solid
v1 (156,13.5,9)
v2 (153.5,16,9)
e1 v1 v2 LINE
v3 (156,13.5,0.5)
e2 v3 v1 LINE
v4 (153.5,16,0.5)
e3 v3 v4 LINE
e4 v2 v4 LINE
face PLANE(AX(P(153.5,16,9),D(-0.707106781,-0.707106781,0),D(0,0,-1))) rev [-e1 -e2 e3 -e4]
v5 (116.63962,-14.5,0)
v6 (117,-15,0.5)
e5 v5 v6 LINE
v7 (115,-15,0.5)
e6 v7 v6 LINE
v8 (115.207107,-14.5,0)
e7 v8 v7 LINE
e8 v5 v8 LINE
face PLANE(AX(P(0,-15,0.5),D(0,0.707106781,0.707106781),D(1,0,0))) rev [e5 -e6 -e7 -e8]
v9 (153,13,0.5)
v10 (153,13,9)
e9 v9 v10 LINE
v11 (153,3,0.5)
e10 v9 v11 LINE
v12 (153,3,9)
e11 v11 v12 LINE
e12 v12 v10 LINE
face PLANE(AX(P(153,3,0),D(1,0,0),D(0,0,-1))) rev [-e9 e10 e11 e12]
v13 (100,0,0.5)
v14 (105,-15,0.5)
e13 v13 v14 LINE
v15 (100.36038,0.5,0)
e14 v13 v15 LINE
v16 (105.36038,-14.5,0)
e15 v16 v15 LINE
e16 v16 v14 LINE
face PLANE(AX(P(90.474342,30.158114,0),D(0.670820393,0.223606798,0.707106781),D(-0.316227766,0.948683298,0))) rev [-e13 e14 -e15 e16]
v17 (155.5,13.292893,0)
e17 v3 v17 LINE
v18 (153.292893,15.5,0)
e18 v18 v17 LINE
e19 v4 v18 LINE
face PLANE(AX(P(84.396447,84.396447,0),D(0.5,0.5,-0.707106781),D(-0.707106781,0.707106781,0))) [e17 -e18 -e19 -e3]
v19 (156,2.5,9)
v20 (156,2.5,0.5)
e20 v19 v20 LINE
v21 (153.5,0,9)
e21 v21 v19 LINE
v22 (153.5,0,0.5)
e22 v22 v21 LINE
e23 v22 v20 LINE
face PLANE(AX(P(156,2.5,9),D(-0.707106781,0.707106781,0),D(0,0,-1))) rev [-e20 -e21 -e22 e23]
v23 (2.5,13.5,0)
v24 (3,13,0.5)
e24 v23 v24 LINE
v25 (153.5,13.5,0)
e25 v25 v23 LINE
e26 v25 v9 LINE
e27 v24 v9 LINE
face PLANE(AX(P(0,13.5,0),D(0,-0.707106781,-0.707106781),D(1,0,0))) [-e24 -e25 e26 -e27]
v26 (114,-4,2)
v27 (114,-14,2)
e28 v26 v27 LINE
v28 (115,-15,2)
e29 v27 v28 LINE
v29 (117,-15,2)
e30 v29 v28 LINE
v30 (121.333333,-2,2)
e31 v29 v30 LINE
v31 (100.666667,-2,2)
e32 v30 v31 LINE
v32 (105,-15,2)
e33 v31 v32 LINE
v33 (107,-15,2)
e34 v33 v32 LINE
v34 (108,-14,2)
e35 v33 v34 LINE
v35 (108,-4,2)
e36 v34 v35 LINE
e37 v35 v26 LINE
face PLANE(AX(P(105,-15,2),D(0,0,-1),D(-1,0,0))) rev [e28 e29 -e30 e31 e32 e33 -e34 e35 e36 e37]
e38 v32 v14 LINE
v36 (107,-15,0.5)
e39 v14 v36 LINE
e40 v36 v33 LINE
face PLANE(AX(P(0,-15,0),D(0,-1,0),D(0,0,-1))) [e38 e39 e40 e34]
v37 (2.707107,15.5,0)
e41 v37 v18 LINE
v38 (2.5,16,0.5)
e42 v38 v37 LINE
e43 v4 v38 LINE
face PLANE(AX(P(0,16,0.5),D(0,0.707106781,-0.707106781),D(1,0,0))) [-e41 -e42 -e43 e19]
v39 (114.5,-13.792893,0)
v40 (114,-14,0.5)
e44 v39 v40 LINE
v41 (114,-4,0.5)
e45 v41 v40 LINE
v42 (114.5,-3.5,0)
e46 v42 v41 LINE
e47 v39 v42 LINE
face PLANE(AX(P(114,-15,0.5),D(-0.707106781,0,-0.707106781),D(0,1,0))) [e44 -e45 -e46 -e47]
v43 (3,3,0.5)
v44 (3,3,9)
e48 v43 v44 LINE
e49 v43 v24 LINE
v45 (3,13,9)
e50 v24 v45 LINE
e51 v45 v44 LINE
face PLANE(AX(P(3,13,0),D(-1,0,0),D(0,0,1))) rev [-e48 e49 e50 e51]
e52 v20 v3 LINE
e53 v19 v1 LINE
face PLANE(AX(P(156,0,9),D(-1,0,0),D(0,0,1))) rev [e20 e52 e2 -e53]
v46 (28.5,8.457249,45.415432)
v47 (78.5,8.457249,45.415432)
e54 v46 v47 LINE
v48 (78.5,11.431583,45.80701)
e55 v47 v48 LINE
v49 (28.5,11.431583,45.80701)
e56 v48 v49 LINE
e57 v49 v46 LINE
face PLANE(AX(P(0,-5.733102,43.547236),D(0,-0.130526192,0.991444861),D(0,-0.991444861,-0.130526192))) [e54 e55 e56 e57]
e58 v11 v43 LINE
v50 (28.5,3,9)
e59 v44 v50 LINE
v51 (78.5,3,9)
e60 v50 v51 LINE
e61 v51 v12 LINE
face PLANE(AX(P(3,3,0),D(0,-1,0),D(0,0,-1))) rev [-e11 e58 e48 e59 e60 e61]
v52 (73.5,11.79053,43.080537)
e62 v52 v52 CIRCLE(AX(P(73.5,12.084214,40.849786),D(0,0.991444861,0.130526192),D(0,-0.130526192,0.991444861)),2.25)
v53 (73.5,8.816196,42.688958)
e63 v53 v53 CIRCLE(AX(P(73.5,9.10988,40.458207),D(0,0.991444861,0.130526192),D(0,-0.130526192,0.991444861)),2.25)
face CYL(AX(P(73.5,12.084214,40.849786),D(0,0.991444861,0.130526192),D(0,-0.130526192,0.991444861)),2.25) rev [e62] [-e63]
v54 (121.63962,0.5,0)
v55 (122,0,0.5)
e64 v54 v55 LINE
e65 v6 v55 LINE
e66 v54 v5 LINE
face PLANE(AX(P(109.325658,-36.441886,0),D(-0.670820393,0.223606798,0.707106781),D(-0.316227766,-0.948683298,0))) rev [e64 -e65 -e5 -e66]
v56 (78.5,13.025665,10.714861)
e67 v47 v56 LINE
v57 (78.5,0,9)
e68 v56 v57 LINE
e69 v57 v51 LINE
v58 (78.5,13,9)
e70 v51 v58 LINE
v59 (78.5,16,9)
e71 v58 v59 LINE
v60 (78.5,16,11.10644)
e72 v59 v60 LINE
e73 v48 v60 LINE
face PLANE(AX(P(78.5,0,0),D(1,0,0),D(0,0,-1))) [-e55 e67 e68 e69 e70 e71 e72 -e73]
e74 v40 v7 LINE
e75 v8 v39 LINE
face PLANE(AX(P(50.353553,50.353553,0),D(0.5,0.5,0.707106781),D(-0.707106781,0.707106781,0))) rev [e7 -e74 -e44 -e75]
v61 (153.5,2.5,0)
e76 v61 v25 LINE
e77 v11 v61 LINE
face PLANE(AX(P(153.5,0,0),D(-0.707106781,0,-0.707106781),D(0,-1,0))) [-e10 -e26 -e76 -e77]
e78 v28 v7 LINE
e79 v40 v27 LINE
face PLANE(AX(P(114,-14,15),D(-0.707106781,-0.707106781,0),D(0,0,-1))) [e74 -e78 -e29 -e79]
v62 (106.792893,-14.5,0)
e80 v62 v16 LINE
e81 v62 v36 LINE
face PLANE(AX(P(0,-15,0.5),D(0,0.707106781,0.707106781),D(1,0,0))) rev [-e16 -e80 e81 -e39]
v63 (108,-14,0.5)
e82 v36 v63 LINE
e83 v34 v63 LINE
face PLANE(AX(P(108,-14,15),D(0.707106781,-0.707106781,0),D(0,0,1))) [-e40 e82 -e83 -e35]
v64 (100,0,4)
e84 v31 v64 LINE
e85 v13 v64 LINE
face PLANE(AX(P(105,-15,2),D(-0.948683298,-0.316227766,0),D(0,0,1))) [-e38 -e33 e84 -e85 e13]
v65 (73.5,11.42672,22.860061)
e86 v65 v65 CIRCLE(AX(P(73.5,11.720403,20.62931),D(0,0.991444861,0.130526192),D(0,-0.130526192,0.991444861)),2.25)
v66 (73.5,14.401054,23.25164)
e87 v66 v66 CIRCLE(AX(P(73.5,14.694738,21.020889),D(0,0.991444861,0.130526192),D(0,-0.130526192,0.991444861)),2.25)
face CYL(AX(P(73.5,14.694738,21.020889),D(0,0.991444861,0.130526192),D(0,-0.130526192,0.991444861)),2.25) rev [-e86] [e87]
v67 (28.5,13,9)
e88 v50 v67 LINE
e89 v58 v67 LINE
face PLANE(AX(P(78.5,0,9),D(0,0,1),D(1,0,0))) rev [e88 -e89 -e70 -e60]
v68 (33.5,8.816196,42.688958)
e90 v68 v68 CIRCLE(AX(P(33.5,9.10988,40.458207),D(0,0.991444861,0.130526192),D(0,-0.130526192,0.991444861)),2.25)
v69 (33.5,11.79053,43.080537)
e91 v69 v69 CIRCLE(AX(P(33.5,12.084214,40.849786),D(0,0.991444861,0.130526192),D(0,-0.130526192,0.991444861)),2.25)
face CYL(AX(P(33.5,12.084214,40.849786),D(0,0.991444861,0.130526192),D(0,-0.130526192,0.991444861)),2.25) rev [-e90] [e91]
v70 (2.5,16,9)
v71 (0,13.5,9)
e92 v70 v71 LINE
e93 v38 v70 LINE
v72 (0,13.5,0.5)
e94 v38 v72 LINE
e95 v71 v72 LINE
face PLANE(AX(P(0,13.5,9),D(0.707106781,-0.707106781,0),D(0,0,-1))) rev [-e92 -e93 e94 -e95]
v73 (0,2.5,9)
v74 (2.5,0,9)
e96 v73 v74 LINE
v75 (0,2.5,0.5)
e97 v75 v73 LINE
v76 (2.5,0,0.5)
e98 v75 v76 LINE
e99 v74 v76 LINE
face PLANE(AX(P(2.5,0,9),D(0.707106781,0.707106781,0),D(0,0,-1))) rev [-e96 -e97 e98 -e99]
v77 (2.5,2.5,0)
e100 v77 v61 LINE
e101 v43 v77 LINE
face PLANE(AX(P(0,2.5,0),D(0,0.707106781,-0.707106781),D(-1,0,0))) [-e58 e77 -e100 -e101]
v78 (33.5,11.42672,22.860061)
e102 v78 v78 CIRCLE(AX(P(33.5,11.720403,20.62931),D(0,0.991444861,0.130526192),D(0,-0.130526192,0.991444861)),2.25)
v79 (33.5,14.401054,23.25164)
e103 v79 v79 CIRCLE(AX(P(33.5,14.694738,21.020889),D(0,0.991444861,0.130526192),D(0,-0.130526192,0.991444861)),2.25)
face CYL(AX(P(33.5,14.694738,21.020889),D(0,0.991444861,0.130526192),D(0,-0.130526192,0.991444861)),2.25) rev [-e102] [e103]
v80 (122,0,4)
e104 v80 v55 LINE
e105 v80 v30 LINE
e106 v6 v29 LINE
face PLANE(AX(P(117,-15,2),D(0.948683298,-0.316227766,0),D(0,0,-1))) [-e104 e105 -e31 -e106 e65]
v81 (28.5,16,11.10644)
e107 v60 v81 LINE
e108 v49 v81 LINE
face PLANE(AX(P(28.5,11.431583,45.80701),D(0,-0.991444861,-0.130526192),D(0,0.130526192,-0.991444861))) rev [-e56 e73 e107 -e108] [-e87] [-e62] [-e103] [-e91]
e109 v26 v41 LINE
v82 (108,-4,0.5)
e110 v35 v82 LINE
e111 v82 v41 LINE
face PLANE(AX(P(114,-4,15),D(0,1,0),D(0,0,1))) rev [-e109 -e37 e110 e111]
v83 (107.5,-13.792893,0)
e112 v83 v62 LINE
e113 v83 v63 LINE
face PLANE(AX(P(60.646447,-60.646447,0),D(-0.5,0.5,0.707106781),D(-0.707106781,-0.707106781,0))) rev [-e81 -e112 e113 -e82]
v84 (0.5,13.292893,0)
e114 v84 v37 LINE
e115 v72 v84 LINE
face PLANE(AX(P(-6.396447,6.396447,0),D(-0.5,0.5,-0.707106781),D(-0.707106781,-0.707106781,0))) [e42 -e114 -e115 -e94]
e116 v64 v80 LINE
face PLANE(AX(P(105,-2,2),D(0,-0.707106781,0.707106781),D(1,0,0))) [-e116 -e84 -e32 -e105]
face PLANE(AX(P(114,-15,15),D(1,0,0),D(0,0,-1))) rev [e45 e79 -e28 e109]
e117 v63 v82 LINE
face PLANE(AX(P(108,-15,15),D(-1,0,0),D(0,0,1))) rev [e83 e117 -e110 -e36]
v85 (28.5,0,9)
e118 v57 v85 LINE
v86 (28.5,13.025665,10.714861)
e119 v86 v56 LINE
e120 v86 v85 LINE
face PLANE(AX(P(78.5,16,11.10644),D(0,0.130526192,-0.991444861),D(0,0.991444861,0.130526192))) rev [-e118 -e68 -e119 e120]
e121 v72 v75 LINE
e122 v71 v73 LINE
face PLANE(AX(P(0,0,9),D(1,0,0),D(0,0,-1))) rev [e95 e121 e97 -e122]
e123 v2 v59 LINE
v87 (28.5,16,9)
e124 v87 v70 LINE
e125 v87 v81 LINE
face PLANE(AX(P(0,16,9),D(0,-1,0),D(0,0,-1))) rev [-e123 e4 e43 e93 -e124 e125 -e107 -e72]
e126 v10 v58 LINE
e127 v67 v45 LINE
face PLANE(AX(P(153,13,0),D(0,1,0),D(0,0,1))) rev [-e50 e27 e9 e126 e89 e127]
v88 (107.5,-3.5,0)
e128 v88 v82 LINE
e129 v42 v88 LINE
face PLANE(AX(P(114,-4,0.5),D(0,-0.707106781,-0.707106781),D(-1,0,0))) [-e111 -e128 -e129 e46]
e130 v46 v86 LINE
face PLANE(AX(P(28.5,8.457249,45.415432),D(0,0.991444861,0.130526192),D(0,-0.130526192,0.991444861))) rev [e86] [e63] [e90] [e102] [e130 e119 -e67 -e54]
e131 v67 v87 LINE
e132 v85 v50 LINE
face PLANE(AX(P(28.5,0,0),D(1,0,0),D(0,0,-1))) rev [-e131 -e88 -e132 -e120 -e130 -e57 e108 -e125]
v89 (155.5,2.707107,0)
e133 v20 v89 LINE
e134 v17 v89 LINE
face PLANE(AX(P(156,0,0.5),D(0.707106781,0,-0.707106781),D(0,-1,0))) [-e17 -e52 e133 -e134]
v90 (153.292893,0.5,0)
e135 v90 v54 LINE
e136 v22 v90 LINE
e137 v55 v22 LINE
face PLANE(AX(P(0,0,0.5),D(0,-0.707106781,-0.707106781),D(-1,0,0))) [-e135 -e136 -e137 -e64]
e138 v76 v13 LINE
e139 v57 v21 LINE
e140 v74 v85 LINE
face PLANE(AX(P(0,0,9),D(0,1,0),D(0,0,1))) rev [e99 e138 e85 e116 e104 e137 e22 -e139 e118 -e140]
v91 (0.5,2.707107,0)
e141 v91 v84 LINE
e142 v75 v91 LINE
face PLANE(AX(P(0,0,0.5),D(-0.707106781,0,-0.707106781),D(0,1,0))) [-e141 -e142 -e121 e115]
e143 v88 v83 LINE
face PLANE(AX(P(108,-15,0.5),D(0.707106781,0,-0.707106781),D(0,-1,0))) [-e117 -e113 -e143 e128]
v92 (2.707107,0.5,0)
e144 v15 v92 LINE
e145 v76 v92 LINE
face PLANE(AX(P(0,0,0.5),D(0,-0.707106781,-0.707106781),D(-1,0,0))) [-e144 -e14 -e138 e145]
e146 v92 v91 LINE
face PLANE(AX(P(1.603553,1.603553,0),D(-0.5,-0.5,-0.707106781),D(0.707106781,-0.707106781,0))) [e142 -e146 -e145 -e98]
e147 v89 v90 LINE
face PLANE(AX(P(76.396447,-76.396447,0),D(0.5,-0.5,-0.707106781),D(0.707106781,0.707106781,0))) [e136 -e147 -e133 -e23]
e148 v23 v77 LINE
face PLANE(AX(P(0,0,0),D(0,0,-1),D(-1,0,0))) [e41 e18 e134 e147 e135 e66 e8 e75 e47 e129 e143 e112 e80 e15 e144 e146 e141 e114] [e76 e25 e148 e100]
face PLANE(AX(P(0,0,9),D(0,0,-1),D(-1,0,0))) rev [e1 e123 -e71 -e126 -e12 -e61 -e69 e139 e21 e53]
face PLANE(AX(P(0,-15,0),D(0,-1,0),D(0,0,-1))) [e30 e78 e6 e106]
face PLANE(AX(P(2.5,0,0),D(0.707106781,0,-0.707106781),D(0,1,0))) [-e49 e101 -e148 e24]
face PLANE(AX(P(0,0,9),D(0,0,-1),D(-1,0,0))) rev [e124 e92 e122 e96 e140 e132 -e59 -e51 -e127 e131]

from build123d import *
from OCP.BRepFilletAPI import BRepFilletAPI_MakeChamfer

# Parameters (mm, degrees)
SKETCH1_W            = 156
SKETCH1_H            = 16
BOSS_EXTRUDE1_DEPTH  = 9
SKETCH2_W            = 150
SKETCH2_H            = 10
CUT_EXTRUDE1_DEPTH   = 9
BOSS_EXTRUDE2_START  = -127.5
BOSS_EXTRUDE2_DEPTH  = 50
SKETCH5_W            = 50
SKETCH5_H            = 3
BOSS_EXTRUDE3_DEPTH  = 35
M4_CLEARANCE_HOLE1_D = 4.5
SKETCH10_W           = 12
SKETCH10_H           = 2
BOSS_EXTRUDE4_DEPTH  = 15
SKETCH11_W           = 6
SKETCH11_H           = 11
CUT_EXTRUDE2_DEPTH   = 15
CHAMFER1_SIZE        = 5
CHAMFER1_SIZE_2      = 15
CHAMFER2_SIZE        = 1
CHAMFER3_SIZE        = 2.5
CHAMFER4_SIZE        = 2
CHAMFER5_SIZE        = 0.5


# Some blends are built 0.0001 mm under size
with BuildPart() as part:
    # Sketch1 → Boss-Extrude1 (new body)
    with BuildSketch(Plane.XY):
        with Locations((78, 8)):
            Rectangle(SKETCH1_W, SKETCH1_H)
    extrude(amount=BOSS_EXTRUDE1_DEPTH)

    # Sketch2 → Cut-Extrude1 (cut)
    with BuildSketch(Plane.XY.offset(9)):
        with Locations((78, 8)):
            Rectangle(SKETCH2_W, SKETCH2_H)
    extrude(amount=-CUT_EXTRUDE1_DEPTH, mode=Mode.SUBTRACT)

    # Sketch4 → Boss-Extrude2 (add)
    with BuildSketch(Plane(origin=(156, 0, 0), x_dir=(0, 0, -1), z_dir=(1, 0, 0)).offset(BOSS_EXTRUDE2_START)):
        Polygon((-9, 16), (-11.106439961, 16), (-9, 0), align=None)
    extrude(amount=BOSS_EXTRUDE2_DEPTH)

    # Sketch5 → Boss-Extrude3 (add)
    with BuildSketch(Plane(origin=(0, -1.164685703, 8.846666218), x_dir=(1, 0, 0), z_dir=(0, -0.13052619222004497, 0.9914448613738114))):
        with Locations((53.5, 15.812799099)):
            Rectangle(SKETCH5_W, SKETCH5_H)
    extrude(amount=BOSS_EXTRUDE3_DEPTH)

    # M4 Clearance Hole1 (through all)
    with Locations(Plane(origin=(0, 17.164685703, 2.259773743), x_dir=(1, 0, 0), z_dir=(0, 0.9914448613738114, 0.130526192220045))):
        with Locations((33.5, -18.923003752), (73.5, -18.923003752), (73.5, -38.923003752), (33.5, -38.923003752)):
            Hole(M4_CLEARANCE_HOLE1_D / 2)

    # Sketch10 → Boss-Extrude4 (add)
    with BuildSketch(Plane.XZ):
        with Locations((111, 1)):
            Rectangle(SKETCH10_W, SKETCH10_H)
    extrude(amount=BOSS_EXTRUDE4_DEPTH)

    # Sketch11 → Cut-Extrude2 (cut)
    with BuildSketch(Plane(origin=(0, 0, 0), x_dir=(-1, 0, 0), z_dir=(0, 0, -1))):
        with Locations((-111, -9.5)):
            Rectangle(SKETCH11_W, SKETCH11_H)
    extrude(amount=-CUT_EXTRUDE2_DEPTH, mode=Mode.SUBTRACT)

    # Chamfer1
    chamfer1_edges_1 = [part.edges().sort_by_distance(p)[0] for p in [
        (117, 0, 1),
    ]]
    chamfer1_side_1 = [part.faces().sort_by_distance(p)[0] for p in [
        (117.1, 0, 1),
    ]]
    chamfer1_edges_2 = [part.edges().sort_by_distance(p)[0] for p in [
        (105, 0, 1),
    ]]
    chamfer1_side_2 = [part.faces().sort_by_distance(p)[0] for p in [
        (104.9, 0, 1),
    ]]
    chamfer1 = BRepFilletAPI_MakeChamfer(part.part.solid().wrapped)
    for e in chamfer1_edges_1:
        chamfer1.Add(CHAMFER1_SIZE - 0.0001, CHAMFER1_SIZE_2 - 0.0001, e.wrapped, chamfer1_side_1[0].wrapped)
    for e in chamfer1_edges_2:
        chamfer1.Add(CHAMFER1_SIZE - 0.0001, CHAMFER1_SIZE_2 - 0.0001, e.wrapped, chamfer1_side_2[0].wrapped)
    add(Compound.cast(chamfer1.Shape()), mode=Mode.REPLACE)  # a hair under: the kernel refuses the full size

    # Chamfer2
    chamfer2_edges = [part.edges().sort_by_distance(p)[0] for p in [
        (108, -15, 1),
        (114, -15, 1),
    ]]
    chamfer(chamfer2_edges, length=CHAMFER2_SIZE)

    # Chamfer3
    chamfer3_edges = [part.edges().sort_by_distance(p)[0] for p in [
        (0, 16, 4.5),
        (156, 16, 4.5),
        (156, 0, 4.5),
        (0, 0, 4.5),
    ]]
    chamfer(chamfer3_edges, length=CHAMFER3_SIZE)

    # Chamfer4
    chamfer4_edges = [part.edges().sort_by_distance(p)[0] for p in [
        (111, 0, 2),
    ]]
    chamfer(chamfer4_edges, length=CHAMFER4_SIZE)

    # Chamfer5
    # the kernel refuses this chamfer: 0.5 mm, written as the material it takes off along each edge
    with BuildSketch(Plane(origin=(114, -4, 0), x_dir=(-0.027495876610582174, 0, 0.9996219169112968), z_dir=(0, -1, 0)), Plane(origin=(108, -15.285841494, 0), x_dir=(0.027495876610582174, 0, 0.9996219169112968), z_dir=(0, 1, 0))) as chamfer5_piece_1:
        Polygon((CHAMFER5_SIZE * 0.999621916911, -CHAMFER5_SIZE * 0.0274958766106), (-CHAMFER5_SIZE * 0.0274958766106, -CHAMFER5_SIZE * 0.999621916911), (0, 0), align=None)
    extrude(amount=11.285841494, mode=Mode.SUBTRACT)
    with BuildSketch(Plane(origin=(108, -4, 0), x_dir=(0, -0.02749587661058563, 0.9996219169112968), z_dir=(1, 0, 0))) as chamfer5_piece_2:
        Polygon((CHAMFER5_SIZE * 0.999621916911, -CHAMFER5_SIZE * 0.0274958766106), (-CHAMFER5_SIZE * 0.0274958766106, -CHAMFER5_SIZE * 0.999621916911), (0, 0), align=None)
    extrude(amount=6, mode=Mode.SUBTRACT)
    with BuildSketch(Plane(origin=(120.714058506, 0, 0), x_dir=(0, -0.027495876610586372, 0.9996219169112968), z_dir=(1, 0, 0))) as chamfer5_piece_3_section:
        Polygon((CHAMFER5_SIZE * 0.999621916911, -CHAMFER5_SIZE * 0.0274958766106), (-CHAMFER5_SIZE * 0.0274958766106, -CHAMFER5_SIZE * 0.999621916911), (0, 0), align=None)
    chamfer5_piece_3 = extrude(amount=34.071782988, mode=Mode.PRIVATE)
    chamfer5_piece_3 = split(chamfer5_piece_3, bisect_by=Plane(origin=(123.691323229, 5.074337344, 0.164983246), z_dir=(0.9486845629641077, -0.31622397125075763, 0)), keep=Keep.TOP, mode=Mode.PRIVATE)
    add(chamfer5_piece_3, mode=Mode.SUBTRACT)
    with BuildSketch(Plane(origin=(122.406513904, 1.219857976, 0), x_dir=(0.026084913685623757, -0.008694855294818641, 0.999621916911297), z_dir=(-0.31622397125075763, -0.9486845629641077, 0))) as chamfer5_piece_4_section:
        Polygon((CHAMFER5_SIZE * 0.999621916911, CHAMFER5_SIZE * 0.0274958766106), (-CHAMFER5_SIZE * 0.0274958766106, CHAMFER5_SIZE * 0.999621916911), (0, 0), align=None)
    chamfer5_piece_4 = extrude(amount=18.382944798, mode=Mode.PRIVATE)
    chamfer5_piece_4 = split(chamfer5_piece_4, bisect_by=Plane(origin=(119.414869386, 0, 0.166750545), z_dir=(0, -1, 0)), keep=Keep.TOP, mode=Mode.PRIVATE)
    add(chamfer5_piece_4, mode=Mode.SUBTRACT)
    with BuildSketch(Plane(origin=(99.593486096, 1.219857976, 0), x_dir=(0.948325881374337, 0.31610441231498504, -0.027495876610587087), z_dir=(0.31622397125075763, -0.9486845629641077, 0))) as chamfer5_piece_5_section:
        Polygon((CHAMFER5_SIZE * 0.999621916911, CHAMFER5_SIZE * 0.0274958766106), (-CHAMFER5_SIZE * 0.0274958766106, CHAMFER5_SIZE * 0.999621916911), (0, 0), align=None)
    chamfer5_piece_5 = extrude(amount=18.382944798, mode=Mode.PRIVATE)
    chamfer5_piece_5 = split(chamfer5_piece_5, bisect_by=Plane(origin=(102.585130614, 0, 0.166750545), z_dir=(0, -1, 0)), keep=Keep.TOP, mode=Mode.PRIVATE)
    add(chamfer5_piece_5, mode=Mode.SUBTRACT)
    with BuildSketch(Plane(origin=(118.285841494, -15, 0), x_dir=(0, -0.02749587661058563, 0.9996219169112968), z_dir=(-1, 0, 0)), Plane(origin=(108.285841494, -15, 0), x_dir=(0, -0.02749587661058563, 0.9996219169112968), z_dir=(-1, 0, 0))) as chamfer5_piece_6:
        Polygon((CHAMFER5_SIZE * 0.999621916911, CHAMFER5_SIZE * 0.0274958766106), (-CHAMFER5_SIZE * 0.0274958766106, CHAMFER5_SIZE * 0.999621916911), (0, 0), align=None)
    extrude(amount=4.571682988, mode=Mode.SUBTRACT)
    with BuildSketch(Plane(origin=(113.09077276, -13.09077276, 0), x_dir=(-0.01944252080601897, -0.01944252080601897, 0.9996219169112965), z_dir=(0.7071067811865476, -0.7071067811865476, 0)), Plane(origin=(106.09077276, -15.90922724, 0), x_dir=(0.019442520806029328, -0.019442520806029328, 0.9996219169112961), z_dir=(0.7071067811865476, 0.7071067811865476, 0))) as chamfer5_piece_7:
        Polygon((CHAMFER5_SIZE * 0.999621916911, -CHAMFER5_SIZE * 0.0274958766106), (-CHAMFER5_SIZE * 0.0274958766106, -CHAMFER5_SIZE * 0.999621916911), (0, 0), align=None)
    extrude(amount=3.98589655, mode=Mode.SUBTRACT)
    with BuildSketch(Plane(origin=(1.214158506, 0, 0), x_dir=(0, -0.027495876610586372, 0.9996219169112968), z_dir=(1, 0, 0))) as chamfer5_piece_8_section:
        Polygon((CHAMFER5_SIZE * 0.999621916911, -CHAMFER5_SIZE * 0.0274958766106), (-CHAMFER5_SIZE * 0.0274958766106, -CHAMFER5_SIZE * 0.999621916911), (0, 0), align=None)
    chamfer5_piece_8 = extrude(amount=100.071782988, mode=Mode.PRIVATE)
    chamfer5_piece_8 = split(chamfer5_piece_8, bisect_by=Plane(origin=(95.008721747, 14.974334417, 0.164925467), z_dir=(-0.9486845629641077, -0.31622397125075763, 0)), keep=Keep.TOP, mode=Mode.PRIVATE)
    add(chamfer5_piece_8, mode=Mode.SUBTRACT)
    with BuildSketch(Plane(origin=(0, 14.785841494, 0), x_dir=(-0.027495876610586372, 0, 0.9996219169112968), z_dir=(0, -1, 0)), Plane(origin=(156, 1.214158506, 0), x_dir=(0.027495876610582174, 0, 0.9996219169112968), z_dir=(0, 1, 0))) as chamfer5_piece_9:
        Polygon((CHAMFER5_SIZE * 0.999621916911, -CHAMFER5_SIZE * 0.0274958766106), (-CHAMFER5_SIZE * 0.0274958766106, -CHAMFER5_SIZE * 0.999621916911), (0, 0), align=None)
    extrude(amount=13.571682988, mode=Mode.SUBTRACT)
    with BuildSketch(Plane(origin=(154.785841494, 16, 0), x_dir=(0, 0.02749587661058908, 0.9996219169112968), z_dir=(-1, 0, 0))) as chamfer5_piece_10:
        Polygon((CHAMFER5_SIZE * 0.999621916911, -CHAMFER5_SIZE * 0.0274958766106), (-CHAMFER5_SIZE * 0.0274958766106, -CHAMFER5_SIZE * 0.999621916911), (0, 0), align=None)
    extrude(amount=153.571682988, mode=Mode.SUBTRACT)
    with BuildSketch(Plane(origin=(152.59077276, -0.90922724, 0), x_dir=(0.01944252080600009, -0.01944252080600009, 0.9996219169112972), z_dir=(0.7071067811865476, 0.7071067811865476, 0)), Plane(origin=(156.90922724, 12.59077276, 0), x_dir=(0.019442520806003442, 0.019442520806003442, 0.9996219169112972), z_dir=(-0.7071067811865476, 0.7071067811865476, 0)), Plane(origin=(3.40922724, 16.90922724, 0), x_dir=(-0.01944252080601509, 0.01944252080601509, 0.9996219169112968), z_dir=(-0.7071067811865476, -0.7071067811865476, 0))) as chamfer5_piece_11:
        Polygon((CHAMFER5_SIZE * 0.999621916911, -CHAMFER5_SIZE * 0.0274958766106), (-CHAMFER5_SIZE * 0.0274958766106, -CHAMFER5_SIZE * 0.999621916911), (0, 0), align=None)
    extrude(amount=6.107216894, mode=Mode.SUBTRACT)
    with BuildSketch(Plane(origin=(3.40922724, -0.90922724, 0), x_dir=(-0.019442520806014007, -0.019442520806014007, 0.9996219169112968), z_dir=(-0.7071067811865476, 0.7071067811865476, 0))) as chamfer5_piece_12:
        Polygon((CHAMFER5_SIZE * 0.999621916911, CHAMFER5_SIZE * 0.0274958766106), (-CHAMFER5_SIZE * 0.0274958766106, CHAMFER5_SIZE * 0.999621916911), (0, 0), align=None)
    extrude(amount=6.107216894, mode=Mode.SUBTRACT)
    with BuildSketch(Plane(origin=(3, 3, 0), x_dir=(0, 0.027495876610586494, 0.9996219169112968), z_dir=(1, 0, 0)), Plane(origin=(153, 13, 0), x_dir=(0, -0.02749587661058563, 0.9996219169112968), z_dir=(-1, 0, 0))) as chamfer5_piece_13:
        Polygon((CHAMFER5_SIZE * 0.999621916911, CHAMFER5_SIZE * 0.0274958766106), (-CHAMFER5_SIZE * 0.0274958766106, CHAMFER5_SIZE * 0.999621916911), (0, 0), align=None)
    extrude(amount=150, mode=Mode.SUBTRACT)
    with BuildSketch(Plane(origin=(3, 13, 0), x_dir=(0.027495876610586494, 0, 0.9996219169112968), z_dir=(0, -1, 0)), Plane(origin=(153, 3, 0), x_dir=(-0.027495876610582174, 0, 0.9996219169112968), z_dir=(0, 1, 0))) as chamfer5_piece_14:
        Polygon((CHAMFER5_SIZE * 0.999621916911, CHAMFER5_SIZE * 0.0274958766106), (-CHAMFER5_SIZE * 0.0274958766106, CHAMFER5_SIZE * 0.999621916911), (0, 0), align=None)
    extrude(amount=10, mode=Mode.SUBTRACT)
    with BuildSketch(Plane(origin=(114, -2.714158506, 0), x_dir=(-0.027495876610582174, 0, 0.9996219169112968), z_dir=(0, -1, 0))) as chamfer5_piece_15a_section:
        Polygon((CHAMFER5_SIZE * 0.999621916911, -CHAMFER5_SIZE * 0.0274958766106), (-CHAMFER5_SIZE * 0.0274958766106, -CHAMFER5_SIZE * 0.999621916911), (0, 0), align=None)
    chamfer5_piece_15a = extrude(amount=12.571682988, mode=Mode.PRIVATE)
    chamfer5_piece_15a = split(chamfer5_piece_15a, bisect_by=Plane(origin=(114.164896813, -4, 0.164896813), z_dir=(0, 1, 0)), keep=Keep.TOP, mode=Mode.PRIVATE)
    with BuildSketch(Plane(origin=(108, -4, 0), x_dir=(0, -0.02749587661058563, 0.9996219169112968), z_dir=(1, 0, 0))) as chamfer5_piece_15b_section:
        Polygon((CHAMFER5_SIZE * 0.999621916911, -CHAMFER5_SIZE * 0.0274958766106), (-CHAMFER5_SIZE * 0.0274958766106, -CHAMFER5_SIZE * 0.999621916911), (0, 0), align=None)
    chamfer5_piece_15b = extrude(amount=7.285841494, mode=Mode.PRIVATE)
    chamfer5_piece_15b = split(chamfer5_piece_15b, bisect_by=Plane(origin=(114, -3.835103187, 0.164896813), z_dir=(1, 0, 0)), keep=Keep.TOP, mode=Mode.PRIVATE)
    chamfer5_piece_15 = chamfer5_piece_15a & chamfer5_piece_15b
    add(chamfer5_piece_15, mode=Mode.SUBTRACT)
    with BuildSketch(Plane(origin=(106.714158506, -4, 0), x_dir=(0, -0.02749587661058563, 0.9996219169112968), z_dir=(1, 0, 0))) as chamfer5_piece_16a_section:
        Polygon((CHAMFER5_SIZE * 0.999621916911, -CHAMFER5_SIZE * 0.0274958766106), (-CHAMFER5_SIZE * 0.0274958766106, -CHAMFER5_SIZE * 0.999621916911), (0, 0), align=None)
    chamfer5_piece_16a = extrude(amount=7.285841494, mode=Mode.PRIVATE)
    chamfer5_piece_16a = split(chamfer5_piece_16a, bisect_by=Plane(origin=(108, -3.835103187, 0.164896813), z_dir=(-1, 0, 0)), keep=Keep.TOP, mode=Mode.PRIVATE)
    with BuildSketch(Plane(origin=(108, -15.285841494, 0), x_dir=(0.027495876610582174, 0, 0.9996219169112968), z_dir=(0, 1, 0))) as chamfer5_piece_16b_section:
        Polygon((CHAMFER5_SIZE * 0.999621916911, -CHAMFER5_SIZE * 0.0274958766106), (-CHAMFER5_SIZE * 0.0274958766106, -CHAMFER5_SIZE * 0.999621916911), (0, 0), align=None)
    chamfer5_piece_16b = extrude(amount=12.571682988, mode=Mode.PRIVATE)
    chamfer5_piece_16b = split(chamfer5_piece_16b, bisect_by=Plane(origin=(107.835103187, -4, 0.164896813), z_dir=(0, 1, 0)), keep=Keep.TOP, mode=Mode.PRIVATE)
    chamfer5_piece_16 = chamfer5_piece_16a & chamfer5_piece_16b
    add(chamfer5_piece_16, mode=Mode.SUBTRACT)
    with BuildSketch(Plane(origin=(120.714058506, 0, 0), x_dir=(0, -0.027495876610586372, 0.9996219169112968), z_dir=(1, 0, 0))) as chamfer5_piece_17a_section:
        Polygon((CHAMFER5_SIZE * 0.999621916911, -CHAMFER5_SIZE * 0.0274958766106), (-CHAMFER5_SIZE * 0.0274958766106, -CHAMFER5_SIZE * 0.999621916911), (0, 0), align=None)
    chamfer5_piece_17a = extrude(amount=34.071782988, mode=Mode.PRIVATE)
    chamfer5_piece_17a = split(chamfer5_piece_17a, bisect_by=Plane(origin=(121.989075947, -0.032472593, 0.162786872), z_dir=(-0.9486845629641077, 0.31622397125075763, 0)), keep=Keep.TOP, mode=Mode.PRIVATE)
    with BuildSketch(Plane(origin=(122.406513904, 1.219857976, 0), x_dir=(0.026084913685623757, -0.008694855294818641, 0.999621916911297), z_dir=(-0.31622397125075763, -0.9486845629641077, 0))) as chamfer5_piece_17b_section:
        Polygon((CHAMFER5_SIZE * 0.999621916911, CHAMFER5_SIZE * 0.0274958766106), (-CHAMFER5_SIZE * 0.0274958766106, CHAMFER5_SIZE * 0.999621916911), (0, 0), align=None)
    chamfer5_piece_17b = extrude(amount=18.382944798, mode=Mode.PRIVATE)
    chamfer5_piece_17b = split(chamfer5_piece_17b, bisect_by=Plane(origin=(122.034129073, 0, 0.162786872), z_dir=(0, 1, 0)), keep=Keep.TOP, mode=Mode.PRIVATE)
    chamfer5_piece_17 = chamfer5_piece_17a & chamfer5_piece_17b
    add(chamfer5_piece_17, mode=Mode.SUBTRACT)
    with BuildSketch(Plane(origin=(1.214158506, 0, 0), x_dir=(0, -0.027495876610586372, 0.9996219169112968), z_dir=(1, 0, 0))) as chamfer5_piece_18a_section:
        Polygon((CHAMFER5_SIZE * 0.999621916911, -CHAMFER5_SIZE * 0.0274958766106), (-CHAMFER5_SIZE * 0.0274958766106, -CHAMFER5_SIZE * 0.999621916911), (0, 0), align=None)
    chamfer5_piece_18a = extrude(amount=100.071782988, mode=Mode.PRIVATE)
    chamfer5_piece_18a = split(chamfer5_piece_18a, bisect_by=Plane(origin=(100.010924053, -0.032472593, 0.162786872), z_dir=(0.9486845629641077, 0.31622397125075763, 0)), keep=Keep.TOP, mode=Mode.PRIVATE)
    with BuildSketch(Plane(origin=(99.593486096, 1.219857976, 0), x_dir=(0.948325881374337, 0.31610441231498504, -0.027495876610587087), z_dir=(0.31622397125075763, -0.9486845629641077, 0))) as chamfer5_piece_18b_section:
        Polygon((CHAMFER5_SIZE * 0.999621916911, CHAMFER5_SIZE * 0.0274958766106), (-CHAMFER5_SIZE * 0.0274958766106, CHAMFER5_SIZE * 0.999621916911), (0, 0), align=None)
    chamfer5_piece_18b = extrude(amount=18.382944798, mode=Mode.PRIVATE)
    chamfer5_piece_18b = split(chamfer5_piece_18b, bisect_by=Plane(origin=(99.965870927, 0, 0.162786872), z_dir=(0, 1, 0)), keep=Keep.TOP, mode=Mode.PRIVATE)
    chamfer5_piece_18 = chamfer5_piece_18a & chamfer5_piece_18b
    add(chamfer5_piece_18, mode=Mode.SUBTRACT)
    with BuildSketch(Plane(origin=(1.714158506, 3, 0), x_dir=(0, 0.027495876610586494, 0.9996219169112968), z_dir=(1, 0, 0))) as chamfer5_piece_19a_section:
        Polygon((CHAMFER5_SIZE * 0.999621916911, CHAMFER5_SIZE * 0.0274958766106), (-CHAMFER5_SIZE * 0.0274958766106, CHAMFER5_SIZE * 0.999621916911), (0, 0), align=None)
    chamfer5_piece_19a = extrude(amount=151.285841494, mode=Mode.PRIVATE)
    chamfer5_piece_19a = split(chamfer5_piece_19a, bisect_by=Plane(origin=(3, 2.835103187, 0.164896813), z_dir=(-1, 0, 0)), keep=Keep.TOP, mode=Mode.PRIVATE)
    with BuildSketch(Plane(origin=(3, 13, 0), x_dir=(0.027495876610586494, 0, 0.9996219169112968), z_dir=(0, -1, 0))) as chamfer5_piece_19b_section:
        Polygon((CHAMFER5_SIZE * 0.999621916911, CHAMFER5_SIZE * 0.0274958766106), (-CHAMFER5_SIZE * 0.0274958766106, CHAMFER5_SIZE * 0.999621916911), (0, 0), align=None)
    chamfer5_piece_19b = extrude(amount=11.285841494, mode=Mode.PRIVATE)
    chamfer5_piece_19b = split(chamfer5_piece_19b, bisect_by=Plane(origin=(2.835103187, 3, 0.164896813), z_dir=(0, -1, 0)), keep=Keep.TOP, mode=Mode.PRIVATE)
    chamfer5_piece_19 = chamfer5_piece_19a & chamfer5_piece_19b
    add(chamfer5_piece_19, mode=Mode.SUBTRACT)
    with BuildSketch(Plane(origin=(3, 3, 0), x_dir=(0, 0.027495876610586494, 0.9996219169112968), z_dir=(1, 0, 0))) as chamfer5_piece_20a_section:
        Polygon((CHAMFER5_SIZE * 0.999621916911, CHAMFER5_SIZE * 0.0274958766106), (-CHAMFER5_SIZE * 0.0274958766106, CHAMFER5_SIZE * 0.999621916911), (0, 0), align=None)
    chamfer5_piece_20a = extrude(amount=151.285841494, mode=Mode.PRIVATE)
    chamfer5_piece_20a = split(chamfer5_piece_20a, bisect_by=Plane(origin=(153, 2.835103187, 0.164896813), z_dir=(1, 0, 0)), keep=Keep.TOP, mode=Mode.PRIVATE)
    with BuildSketch(Plane(origin=(153, 1.714158506, 0), x_dir=(-0.027495876610582174, 0, 0.9996219169112968), z_dir=(0, 1, 0))) as chamfer5_piece_20b_section:
        Polygon((CHAMFER5_SIZE * 0.999621916911, CHAMFER5_SIZE * 0.0274958766106), (-CHAMFER5_SIZE * 0.0274958766106, CHAMFER5_SIZE * 0.999621916911), (0, 0), align=None)
    chamfer5_piece_20b = extrude(amount=11.285841494, mode=Mode.PRIVATE)
    chamfer5_piece_20b = split(chamfer5_piece_20b, bisect_by=Plane(origin=(153.164896813, 3, 0.164896813), z_dir=(0, -1, 0)), keep=Keep.TOP, mode=Mode.PRIVATE)
    chamfer5_piece_20 = chamfer5_piece_20a & chamfer5_piece_20b
    add(chamfer5_piece_20, mode=Mode.SUBTRACT)
    with BuildSketch(Plane(origin=(3, 14.285841494, 0), x_dir=(0.027495876610586494, 0, 0.9996219169112968), z_dir=(0, -1, 0))) as chamfer5_piece_21a_section:
        Polygon((CHAMFER5_SIZE * 0.999621916911, CHAMFER5_SIZE * 0.0274958766106), (-CHAMFER5_SIZE * 0.0274958766106, CHAMFER5_SIZE * 0.999621916911), (0, 0), align=None)
    chamfer5_piece_21a = extrude(amount=11.285841494, mode=Mode.PRIVATE)
    chamfer5_piece_21a = split(chamfer5_piece_21a, bisect_by=Plane(origin=(2.835103187, 13, 0.164896813), z_dir=(0, 1, 0)), keep=Keep.TOP, mode=Mode.PRIVATE)
    with BuildSketch(Plane(origin=(153, 13, 0), x_dir=(0, -0.02749587661058563, 0.9996219169112968), z_dir=(-1, 0, 0))) as chamfer5_piece_21b_section:
        Polygon((CHAMFER5_SIZE * 0.999621916911, CHAMFER5_SIZE * 0.0274958766106), (-CHAMFER5_SIZE * 0.0274958766106, CHAMFER5_SIZE * 0.999621916911), (0, 0), align=None)
    chamfer5_piece_21b = extrude(amount=151.285841494, mode=Mode.PRIVATE)
    chamfer5_piece_21b = split(chamfer5_piece_21b, bisect_by=Plane(origin=(3, 13.164896813, 0.164896813), z_dir=(-1, 0, 0)), keep=Keep.TOP, mode=Mode.PRIVATE)
    chamfer5_piece_21 = chamfer5_piece_21a & chamfer5_piece_21b
    add(chamfer5_piece_21, mode=Mode.SUBTRACT)
    with BuildSketch(Plane(origin=(153, 3, 0), x_dir=(-0.027495876610582174, 0, 0.9996219169112968), z_dir=(0, 1, 0))) as chamfer5_piece_22a_section:
        Polygon((CHAMFER5_SIZE * 0.999621916911, CHAMFER5_SIZE * 0.0274958766106), (-CHAMFER5_SIZE * 0.0274958766106, CHAMFER5_SIZE * 0.999621916911), (0, 0), align=None)
    chamfer5_piece_22a = extrude(amount=11.285841494, mode=Mode.PRIVATE)
    chamfer5_piece_22a = split(chamfer5_piece_22a, bisect_by=Plane(origin=(153.164896813, 13, 0.164896813), z_dir=(0, 1, 0)), keep=Keep.TOP, mode=Mode.PRIVATE)
    with BuildSketch(Plane(origin=(154.285841494, 13, 0), x_dir=(0, -0.02749587661058563, 0.9996219169112968), z_dir=(-1, 0, 0))) as chamfer5_piece_22b_section:
        Polygon((CHAMFER5_SIZE * 0.999621916911, CHAMFER5_SIZE * 0.0274958766106), (-CHAMFER5_SIZE * 0.0274958766106, CHAMFER5_SIZE * 0.999621916911), (0, 0), align=None)
    chamfer5_piece_22b = extrude(amount=151.285841494, mode=Mode.PRIVATE)
    chamfer5_piece_22b = split(chamfer5_piece_22b, bisect_by=Plane(origin=(153, 13.164896813, 0.164896813), z_dir=(1, 0, 0)), keep=Keep.TOP, mode=Mode.PRIVATE)
    chamfer5_piece_22 = chamfer5_piece_22a & chamfer5_piece_22b
    add(chamfer5_piece_22, mode=Mode.SUBTRACT)


solid = part.part
